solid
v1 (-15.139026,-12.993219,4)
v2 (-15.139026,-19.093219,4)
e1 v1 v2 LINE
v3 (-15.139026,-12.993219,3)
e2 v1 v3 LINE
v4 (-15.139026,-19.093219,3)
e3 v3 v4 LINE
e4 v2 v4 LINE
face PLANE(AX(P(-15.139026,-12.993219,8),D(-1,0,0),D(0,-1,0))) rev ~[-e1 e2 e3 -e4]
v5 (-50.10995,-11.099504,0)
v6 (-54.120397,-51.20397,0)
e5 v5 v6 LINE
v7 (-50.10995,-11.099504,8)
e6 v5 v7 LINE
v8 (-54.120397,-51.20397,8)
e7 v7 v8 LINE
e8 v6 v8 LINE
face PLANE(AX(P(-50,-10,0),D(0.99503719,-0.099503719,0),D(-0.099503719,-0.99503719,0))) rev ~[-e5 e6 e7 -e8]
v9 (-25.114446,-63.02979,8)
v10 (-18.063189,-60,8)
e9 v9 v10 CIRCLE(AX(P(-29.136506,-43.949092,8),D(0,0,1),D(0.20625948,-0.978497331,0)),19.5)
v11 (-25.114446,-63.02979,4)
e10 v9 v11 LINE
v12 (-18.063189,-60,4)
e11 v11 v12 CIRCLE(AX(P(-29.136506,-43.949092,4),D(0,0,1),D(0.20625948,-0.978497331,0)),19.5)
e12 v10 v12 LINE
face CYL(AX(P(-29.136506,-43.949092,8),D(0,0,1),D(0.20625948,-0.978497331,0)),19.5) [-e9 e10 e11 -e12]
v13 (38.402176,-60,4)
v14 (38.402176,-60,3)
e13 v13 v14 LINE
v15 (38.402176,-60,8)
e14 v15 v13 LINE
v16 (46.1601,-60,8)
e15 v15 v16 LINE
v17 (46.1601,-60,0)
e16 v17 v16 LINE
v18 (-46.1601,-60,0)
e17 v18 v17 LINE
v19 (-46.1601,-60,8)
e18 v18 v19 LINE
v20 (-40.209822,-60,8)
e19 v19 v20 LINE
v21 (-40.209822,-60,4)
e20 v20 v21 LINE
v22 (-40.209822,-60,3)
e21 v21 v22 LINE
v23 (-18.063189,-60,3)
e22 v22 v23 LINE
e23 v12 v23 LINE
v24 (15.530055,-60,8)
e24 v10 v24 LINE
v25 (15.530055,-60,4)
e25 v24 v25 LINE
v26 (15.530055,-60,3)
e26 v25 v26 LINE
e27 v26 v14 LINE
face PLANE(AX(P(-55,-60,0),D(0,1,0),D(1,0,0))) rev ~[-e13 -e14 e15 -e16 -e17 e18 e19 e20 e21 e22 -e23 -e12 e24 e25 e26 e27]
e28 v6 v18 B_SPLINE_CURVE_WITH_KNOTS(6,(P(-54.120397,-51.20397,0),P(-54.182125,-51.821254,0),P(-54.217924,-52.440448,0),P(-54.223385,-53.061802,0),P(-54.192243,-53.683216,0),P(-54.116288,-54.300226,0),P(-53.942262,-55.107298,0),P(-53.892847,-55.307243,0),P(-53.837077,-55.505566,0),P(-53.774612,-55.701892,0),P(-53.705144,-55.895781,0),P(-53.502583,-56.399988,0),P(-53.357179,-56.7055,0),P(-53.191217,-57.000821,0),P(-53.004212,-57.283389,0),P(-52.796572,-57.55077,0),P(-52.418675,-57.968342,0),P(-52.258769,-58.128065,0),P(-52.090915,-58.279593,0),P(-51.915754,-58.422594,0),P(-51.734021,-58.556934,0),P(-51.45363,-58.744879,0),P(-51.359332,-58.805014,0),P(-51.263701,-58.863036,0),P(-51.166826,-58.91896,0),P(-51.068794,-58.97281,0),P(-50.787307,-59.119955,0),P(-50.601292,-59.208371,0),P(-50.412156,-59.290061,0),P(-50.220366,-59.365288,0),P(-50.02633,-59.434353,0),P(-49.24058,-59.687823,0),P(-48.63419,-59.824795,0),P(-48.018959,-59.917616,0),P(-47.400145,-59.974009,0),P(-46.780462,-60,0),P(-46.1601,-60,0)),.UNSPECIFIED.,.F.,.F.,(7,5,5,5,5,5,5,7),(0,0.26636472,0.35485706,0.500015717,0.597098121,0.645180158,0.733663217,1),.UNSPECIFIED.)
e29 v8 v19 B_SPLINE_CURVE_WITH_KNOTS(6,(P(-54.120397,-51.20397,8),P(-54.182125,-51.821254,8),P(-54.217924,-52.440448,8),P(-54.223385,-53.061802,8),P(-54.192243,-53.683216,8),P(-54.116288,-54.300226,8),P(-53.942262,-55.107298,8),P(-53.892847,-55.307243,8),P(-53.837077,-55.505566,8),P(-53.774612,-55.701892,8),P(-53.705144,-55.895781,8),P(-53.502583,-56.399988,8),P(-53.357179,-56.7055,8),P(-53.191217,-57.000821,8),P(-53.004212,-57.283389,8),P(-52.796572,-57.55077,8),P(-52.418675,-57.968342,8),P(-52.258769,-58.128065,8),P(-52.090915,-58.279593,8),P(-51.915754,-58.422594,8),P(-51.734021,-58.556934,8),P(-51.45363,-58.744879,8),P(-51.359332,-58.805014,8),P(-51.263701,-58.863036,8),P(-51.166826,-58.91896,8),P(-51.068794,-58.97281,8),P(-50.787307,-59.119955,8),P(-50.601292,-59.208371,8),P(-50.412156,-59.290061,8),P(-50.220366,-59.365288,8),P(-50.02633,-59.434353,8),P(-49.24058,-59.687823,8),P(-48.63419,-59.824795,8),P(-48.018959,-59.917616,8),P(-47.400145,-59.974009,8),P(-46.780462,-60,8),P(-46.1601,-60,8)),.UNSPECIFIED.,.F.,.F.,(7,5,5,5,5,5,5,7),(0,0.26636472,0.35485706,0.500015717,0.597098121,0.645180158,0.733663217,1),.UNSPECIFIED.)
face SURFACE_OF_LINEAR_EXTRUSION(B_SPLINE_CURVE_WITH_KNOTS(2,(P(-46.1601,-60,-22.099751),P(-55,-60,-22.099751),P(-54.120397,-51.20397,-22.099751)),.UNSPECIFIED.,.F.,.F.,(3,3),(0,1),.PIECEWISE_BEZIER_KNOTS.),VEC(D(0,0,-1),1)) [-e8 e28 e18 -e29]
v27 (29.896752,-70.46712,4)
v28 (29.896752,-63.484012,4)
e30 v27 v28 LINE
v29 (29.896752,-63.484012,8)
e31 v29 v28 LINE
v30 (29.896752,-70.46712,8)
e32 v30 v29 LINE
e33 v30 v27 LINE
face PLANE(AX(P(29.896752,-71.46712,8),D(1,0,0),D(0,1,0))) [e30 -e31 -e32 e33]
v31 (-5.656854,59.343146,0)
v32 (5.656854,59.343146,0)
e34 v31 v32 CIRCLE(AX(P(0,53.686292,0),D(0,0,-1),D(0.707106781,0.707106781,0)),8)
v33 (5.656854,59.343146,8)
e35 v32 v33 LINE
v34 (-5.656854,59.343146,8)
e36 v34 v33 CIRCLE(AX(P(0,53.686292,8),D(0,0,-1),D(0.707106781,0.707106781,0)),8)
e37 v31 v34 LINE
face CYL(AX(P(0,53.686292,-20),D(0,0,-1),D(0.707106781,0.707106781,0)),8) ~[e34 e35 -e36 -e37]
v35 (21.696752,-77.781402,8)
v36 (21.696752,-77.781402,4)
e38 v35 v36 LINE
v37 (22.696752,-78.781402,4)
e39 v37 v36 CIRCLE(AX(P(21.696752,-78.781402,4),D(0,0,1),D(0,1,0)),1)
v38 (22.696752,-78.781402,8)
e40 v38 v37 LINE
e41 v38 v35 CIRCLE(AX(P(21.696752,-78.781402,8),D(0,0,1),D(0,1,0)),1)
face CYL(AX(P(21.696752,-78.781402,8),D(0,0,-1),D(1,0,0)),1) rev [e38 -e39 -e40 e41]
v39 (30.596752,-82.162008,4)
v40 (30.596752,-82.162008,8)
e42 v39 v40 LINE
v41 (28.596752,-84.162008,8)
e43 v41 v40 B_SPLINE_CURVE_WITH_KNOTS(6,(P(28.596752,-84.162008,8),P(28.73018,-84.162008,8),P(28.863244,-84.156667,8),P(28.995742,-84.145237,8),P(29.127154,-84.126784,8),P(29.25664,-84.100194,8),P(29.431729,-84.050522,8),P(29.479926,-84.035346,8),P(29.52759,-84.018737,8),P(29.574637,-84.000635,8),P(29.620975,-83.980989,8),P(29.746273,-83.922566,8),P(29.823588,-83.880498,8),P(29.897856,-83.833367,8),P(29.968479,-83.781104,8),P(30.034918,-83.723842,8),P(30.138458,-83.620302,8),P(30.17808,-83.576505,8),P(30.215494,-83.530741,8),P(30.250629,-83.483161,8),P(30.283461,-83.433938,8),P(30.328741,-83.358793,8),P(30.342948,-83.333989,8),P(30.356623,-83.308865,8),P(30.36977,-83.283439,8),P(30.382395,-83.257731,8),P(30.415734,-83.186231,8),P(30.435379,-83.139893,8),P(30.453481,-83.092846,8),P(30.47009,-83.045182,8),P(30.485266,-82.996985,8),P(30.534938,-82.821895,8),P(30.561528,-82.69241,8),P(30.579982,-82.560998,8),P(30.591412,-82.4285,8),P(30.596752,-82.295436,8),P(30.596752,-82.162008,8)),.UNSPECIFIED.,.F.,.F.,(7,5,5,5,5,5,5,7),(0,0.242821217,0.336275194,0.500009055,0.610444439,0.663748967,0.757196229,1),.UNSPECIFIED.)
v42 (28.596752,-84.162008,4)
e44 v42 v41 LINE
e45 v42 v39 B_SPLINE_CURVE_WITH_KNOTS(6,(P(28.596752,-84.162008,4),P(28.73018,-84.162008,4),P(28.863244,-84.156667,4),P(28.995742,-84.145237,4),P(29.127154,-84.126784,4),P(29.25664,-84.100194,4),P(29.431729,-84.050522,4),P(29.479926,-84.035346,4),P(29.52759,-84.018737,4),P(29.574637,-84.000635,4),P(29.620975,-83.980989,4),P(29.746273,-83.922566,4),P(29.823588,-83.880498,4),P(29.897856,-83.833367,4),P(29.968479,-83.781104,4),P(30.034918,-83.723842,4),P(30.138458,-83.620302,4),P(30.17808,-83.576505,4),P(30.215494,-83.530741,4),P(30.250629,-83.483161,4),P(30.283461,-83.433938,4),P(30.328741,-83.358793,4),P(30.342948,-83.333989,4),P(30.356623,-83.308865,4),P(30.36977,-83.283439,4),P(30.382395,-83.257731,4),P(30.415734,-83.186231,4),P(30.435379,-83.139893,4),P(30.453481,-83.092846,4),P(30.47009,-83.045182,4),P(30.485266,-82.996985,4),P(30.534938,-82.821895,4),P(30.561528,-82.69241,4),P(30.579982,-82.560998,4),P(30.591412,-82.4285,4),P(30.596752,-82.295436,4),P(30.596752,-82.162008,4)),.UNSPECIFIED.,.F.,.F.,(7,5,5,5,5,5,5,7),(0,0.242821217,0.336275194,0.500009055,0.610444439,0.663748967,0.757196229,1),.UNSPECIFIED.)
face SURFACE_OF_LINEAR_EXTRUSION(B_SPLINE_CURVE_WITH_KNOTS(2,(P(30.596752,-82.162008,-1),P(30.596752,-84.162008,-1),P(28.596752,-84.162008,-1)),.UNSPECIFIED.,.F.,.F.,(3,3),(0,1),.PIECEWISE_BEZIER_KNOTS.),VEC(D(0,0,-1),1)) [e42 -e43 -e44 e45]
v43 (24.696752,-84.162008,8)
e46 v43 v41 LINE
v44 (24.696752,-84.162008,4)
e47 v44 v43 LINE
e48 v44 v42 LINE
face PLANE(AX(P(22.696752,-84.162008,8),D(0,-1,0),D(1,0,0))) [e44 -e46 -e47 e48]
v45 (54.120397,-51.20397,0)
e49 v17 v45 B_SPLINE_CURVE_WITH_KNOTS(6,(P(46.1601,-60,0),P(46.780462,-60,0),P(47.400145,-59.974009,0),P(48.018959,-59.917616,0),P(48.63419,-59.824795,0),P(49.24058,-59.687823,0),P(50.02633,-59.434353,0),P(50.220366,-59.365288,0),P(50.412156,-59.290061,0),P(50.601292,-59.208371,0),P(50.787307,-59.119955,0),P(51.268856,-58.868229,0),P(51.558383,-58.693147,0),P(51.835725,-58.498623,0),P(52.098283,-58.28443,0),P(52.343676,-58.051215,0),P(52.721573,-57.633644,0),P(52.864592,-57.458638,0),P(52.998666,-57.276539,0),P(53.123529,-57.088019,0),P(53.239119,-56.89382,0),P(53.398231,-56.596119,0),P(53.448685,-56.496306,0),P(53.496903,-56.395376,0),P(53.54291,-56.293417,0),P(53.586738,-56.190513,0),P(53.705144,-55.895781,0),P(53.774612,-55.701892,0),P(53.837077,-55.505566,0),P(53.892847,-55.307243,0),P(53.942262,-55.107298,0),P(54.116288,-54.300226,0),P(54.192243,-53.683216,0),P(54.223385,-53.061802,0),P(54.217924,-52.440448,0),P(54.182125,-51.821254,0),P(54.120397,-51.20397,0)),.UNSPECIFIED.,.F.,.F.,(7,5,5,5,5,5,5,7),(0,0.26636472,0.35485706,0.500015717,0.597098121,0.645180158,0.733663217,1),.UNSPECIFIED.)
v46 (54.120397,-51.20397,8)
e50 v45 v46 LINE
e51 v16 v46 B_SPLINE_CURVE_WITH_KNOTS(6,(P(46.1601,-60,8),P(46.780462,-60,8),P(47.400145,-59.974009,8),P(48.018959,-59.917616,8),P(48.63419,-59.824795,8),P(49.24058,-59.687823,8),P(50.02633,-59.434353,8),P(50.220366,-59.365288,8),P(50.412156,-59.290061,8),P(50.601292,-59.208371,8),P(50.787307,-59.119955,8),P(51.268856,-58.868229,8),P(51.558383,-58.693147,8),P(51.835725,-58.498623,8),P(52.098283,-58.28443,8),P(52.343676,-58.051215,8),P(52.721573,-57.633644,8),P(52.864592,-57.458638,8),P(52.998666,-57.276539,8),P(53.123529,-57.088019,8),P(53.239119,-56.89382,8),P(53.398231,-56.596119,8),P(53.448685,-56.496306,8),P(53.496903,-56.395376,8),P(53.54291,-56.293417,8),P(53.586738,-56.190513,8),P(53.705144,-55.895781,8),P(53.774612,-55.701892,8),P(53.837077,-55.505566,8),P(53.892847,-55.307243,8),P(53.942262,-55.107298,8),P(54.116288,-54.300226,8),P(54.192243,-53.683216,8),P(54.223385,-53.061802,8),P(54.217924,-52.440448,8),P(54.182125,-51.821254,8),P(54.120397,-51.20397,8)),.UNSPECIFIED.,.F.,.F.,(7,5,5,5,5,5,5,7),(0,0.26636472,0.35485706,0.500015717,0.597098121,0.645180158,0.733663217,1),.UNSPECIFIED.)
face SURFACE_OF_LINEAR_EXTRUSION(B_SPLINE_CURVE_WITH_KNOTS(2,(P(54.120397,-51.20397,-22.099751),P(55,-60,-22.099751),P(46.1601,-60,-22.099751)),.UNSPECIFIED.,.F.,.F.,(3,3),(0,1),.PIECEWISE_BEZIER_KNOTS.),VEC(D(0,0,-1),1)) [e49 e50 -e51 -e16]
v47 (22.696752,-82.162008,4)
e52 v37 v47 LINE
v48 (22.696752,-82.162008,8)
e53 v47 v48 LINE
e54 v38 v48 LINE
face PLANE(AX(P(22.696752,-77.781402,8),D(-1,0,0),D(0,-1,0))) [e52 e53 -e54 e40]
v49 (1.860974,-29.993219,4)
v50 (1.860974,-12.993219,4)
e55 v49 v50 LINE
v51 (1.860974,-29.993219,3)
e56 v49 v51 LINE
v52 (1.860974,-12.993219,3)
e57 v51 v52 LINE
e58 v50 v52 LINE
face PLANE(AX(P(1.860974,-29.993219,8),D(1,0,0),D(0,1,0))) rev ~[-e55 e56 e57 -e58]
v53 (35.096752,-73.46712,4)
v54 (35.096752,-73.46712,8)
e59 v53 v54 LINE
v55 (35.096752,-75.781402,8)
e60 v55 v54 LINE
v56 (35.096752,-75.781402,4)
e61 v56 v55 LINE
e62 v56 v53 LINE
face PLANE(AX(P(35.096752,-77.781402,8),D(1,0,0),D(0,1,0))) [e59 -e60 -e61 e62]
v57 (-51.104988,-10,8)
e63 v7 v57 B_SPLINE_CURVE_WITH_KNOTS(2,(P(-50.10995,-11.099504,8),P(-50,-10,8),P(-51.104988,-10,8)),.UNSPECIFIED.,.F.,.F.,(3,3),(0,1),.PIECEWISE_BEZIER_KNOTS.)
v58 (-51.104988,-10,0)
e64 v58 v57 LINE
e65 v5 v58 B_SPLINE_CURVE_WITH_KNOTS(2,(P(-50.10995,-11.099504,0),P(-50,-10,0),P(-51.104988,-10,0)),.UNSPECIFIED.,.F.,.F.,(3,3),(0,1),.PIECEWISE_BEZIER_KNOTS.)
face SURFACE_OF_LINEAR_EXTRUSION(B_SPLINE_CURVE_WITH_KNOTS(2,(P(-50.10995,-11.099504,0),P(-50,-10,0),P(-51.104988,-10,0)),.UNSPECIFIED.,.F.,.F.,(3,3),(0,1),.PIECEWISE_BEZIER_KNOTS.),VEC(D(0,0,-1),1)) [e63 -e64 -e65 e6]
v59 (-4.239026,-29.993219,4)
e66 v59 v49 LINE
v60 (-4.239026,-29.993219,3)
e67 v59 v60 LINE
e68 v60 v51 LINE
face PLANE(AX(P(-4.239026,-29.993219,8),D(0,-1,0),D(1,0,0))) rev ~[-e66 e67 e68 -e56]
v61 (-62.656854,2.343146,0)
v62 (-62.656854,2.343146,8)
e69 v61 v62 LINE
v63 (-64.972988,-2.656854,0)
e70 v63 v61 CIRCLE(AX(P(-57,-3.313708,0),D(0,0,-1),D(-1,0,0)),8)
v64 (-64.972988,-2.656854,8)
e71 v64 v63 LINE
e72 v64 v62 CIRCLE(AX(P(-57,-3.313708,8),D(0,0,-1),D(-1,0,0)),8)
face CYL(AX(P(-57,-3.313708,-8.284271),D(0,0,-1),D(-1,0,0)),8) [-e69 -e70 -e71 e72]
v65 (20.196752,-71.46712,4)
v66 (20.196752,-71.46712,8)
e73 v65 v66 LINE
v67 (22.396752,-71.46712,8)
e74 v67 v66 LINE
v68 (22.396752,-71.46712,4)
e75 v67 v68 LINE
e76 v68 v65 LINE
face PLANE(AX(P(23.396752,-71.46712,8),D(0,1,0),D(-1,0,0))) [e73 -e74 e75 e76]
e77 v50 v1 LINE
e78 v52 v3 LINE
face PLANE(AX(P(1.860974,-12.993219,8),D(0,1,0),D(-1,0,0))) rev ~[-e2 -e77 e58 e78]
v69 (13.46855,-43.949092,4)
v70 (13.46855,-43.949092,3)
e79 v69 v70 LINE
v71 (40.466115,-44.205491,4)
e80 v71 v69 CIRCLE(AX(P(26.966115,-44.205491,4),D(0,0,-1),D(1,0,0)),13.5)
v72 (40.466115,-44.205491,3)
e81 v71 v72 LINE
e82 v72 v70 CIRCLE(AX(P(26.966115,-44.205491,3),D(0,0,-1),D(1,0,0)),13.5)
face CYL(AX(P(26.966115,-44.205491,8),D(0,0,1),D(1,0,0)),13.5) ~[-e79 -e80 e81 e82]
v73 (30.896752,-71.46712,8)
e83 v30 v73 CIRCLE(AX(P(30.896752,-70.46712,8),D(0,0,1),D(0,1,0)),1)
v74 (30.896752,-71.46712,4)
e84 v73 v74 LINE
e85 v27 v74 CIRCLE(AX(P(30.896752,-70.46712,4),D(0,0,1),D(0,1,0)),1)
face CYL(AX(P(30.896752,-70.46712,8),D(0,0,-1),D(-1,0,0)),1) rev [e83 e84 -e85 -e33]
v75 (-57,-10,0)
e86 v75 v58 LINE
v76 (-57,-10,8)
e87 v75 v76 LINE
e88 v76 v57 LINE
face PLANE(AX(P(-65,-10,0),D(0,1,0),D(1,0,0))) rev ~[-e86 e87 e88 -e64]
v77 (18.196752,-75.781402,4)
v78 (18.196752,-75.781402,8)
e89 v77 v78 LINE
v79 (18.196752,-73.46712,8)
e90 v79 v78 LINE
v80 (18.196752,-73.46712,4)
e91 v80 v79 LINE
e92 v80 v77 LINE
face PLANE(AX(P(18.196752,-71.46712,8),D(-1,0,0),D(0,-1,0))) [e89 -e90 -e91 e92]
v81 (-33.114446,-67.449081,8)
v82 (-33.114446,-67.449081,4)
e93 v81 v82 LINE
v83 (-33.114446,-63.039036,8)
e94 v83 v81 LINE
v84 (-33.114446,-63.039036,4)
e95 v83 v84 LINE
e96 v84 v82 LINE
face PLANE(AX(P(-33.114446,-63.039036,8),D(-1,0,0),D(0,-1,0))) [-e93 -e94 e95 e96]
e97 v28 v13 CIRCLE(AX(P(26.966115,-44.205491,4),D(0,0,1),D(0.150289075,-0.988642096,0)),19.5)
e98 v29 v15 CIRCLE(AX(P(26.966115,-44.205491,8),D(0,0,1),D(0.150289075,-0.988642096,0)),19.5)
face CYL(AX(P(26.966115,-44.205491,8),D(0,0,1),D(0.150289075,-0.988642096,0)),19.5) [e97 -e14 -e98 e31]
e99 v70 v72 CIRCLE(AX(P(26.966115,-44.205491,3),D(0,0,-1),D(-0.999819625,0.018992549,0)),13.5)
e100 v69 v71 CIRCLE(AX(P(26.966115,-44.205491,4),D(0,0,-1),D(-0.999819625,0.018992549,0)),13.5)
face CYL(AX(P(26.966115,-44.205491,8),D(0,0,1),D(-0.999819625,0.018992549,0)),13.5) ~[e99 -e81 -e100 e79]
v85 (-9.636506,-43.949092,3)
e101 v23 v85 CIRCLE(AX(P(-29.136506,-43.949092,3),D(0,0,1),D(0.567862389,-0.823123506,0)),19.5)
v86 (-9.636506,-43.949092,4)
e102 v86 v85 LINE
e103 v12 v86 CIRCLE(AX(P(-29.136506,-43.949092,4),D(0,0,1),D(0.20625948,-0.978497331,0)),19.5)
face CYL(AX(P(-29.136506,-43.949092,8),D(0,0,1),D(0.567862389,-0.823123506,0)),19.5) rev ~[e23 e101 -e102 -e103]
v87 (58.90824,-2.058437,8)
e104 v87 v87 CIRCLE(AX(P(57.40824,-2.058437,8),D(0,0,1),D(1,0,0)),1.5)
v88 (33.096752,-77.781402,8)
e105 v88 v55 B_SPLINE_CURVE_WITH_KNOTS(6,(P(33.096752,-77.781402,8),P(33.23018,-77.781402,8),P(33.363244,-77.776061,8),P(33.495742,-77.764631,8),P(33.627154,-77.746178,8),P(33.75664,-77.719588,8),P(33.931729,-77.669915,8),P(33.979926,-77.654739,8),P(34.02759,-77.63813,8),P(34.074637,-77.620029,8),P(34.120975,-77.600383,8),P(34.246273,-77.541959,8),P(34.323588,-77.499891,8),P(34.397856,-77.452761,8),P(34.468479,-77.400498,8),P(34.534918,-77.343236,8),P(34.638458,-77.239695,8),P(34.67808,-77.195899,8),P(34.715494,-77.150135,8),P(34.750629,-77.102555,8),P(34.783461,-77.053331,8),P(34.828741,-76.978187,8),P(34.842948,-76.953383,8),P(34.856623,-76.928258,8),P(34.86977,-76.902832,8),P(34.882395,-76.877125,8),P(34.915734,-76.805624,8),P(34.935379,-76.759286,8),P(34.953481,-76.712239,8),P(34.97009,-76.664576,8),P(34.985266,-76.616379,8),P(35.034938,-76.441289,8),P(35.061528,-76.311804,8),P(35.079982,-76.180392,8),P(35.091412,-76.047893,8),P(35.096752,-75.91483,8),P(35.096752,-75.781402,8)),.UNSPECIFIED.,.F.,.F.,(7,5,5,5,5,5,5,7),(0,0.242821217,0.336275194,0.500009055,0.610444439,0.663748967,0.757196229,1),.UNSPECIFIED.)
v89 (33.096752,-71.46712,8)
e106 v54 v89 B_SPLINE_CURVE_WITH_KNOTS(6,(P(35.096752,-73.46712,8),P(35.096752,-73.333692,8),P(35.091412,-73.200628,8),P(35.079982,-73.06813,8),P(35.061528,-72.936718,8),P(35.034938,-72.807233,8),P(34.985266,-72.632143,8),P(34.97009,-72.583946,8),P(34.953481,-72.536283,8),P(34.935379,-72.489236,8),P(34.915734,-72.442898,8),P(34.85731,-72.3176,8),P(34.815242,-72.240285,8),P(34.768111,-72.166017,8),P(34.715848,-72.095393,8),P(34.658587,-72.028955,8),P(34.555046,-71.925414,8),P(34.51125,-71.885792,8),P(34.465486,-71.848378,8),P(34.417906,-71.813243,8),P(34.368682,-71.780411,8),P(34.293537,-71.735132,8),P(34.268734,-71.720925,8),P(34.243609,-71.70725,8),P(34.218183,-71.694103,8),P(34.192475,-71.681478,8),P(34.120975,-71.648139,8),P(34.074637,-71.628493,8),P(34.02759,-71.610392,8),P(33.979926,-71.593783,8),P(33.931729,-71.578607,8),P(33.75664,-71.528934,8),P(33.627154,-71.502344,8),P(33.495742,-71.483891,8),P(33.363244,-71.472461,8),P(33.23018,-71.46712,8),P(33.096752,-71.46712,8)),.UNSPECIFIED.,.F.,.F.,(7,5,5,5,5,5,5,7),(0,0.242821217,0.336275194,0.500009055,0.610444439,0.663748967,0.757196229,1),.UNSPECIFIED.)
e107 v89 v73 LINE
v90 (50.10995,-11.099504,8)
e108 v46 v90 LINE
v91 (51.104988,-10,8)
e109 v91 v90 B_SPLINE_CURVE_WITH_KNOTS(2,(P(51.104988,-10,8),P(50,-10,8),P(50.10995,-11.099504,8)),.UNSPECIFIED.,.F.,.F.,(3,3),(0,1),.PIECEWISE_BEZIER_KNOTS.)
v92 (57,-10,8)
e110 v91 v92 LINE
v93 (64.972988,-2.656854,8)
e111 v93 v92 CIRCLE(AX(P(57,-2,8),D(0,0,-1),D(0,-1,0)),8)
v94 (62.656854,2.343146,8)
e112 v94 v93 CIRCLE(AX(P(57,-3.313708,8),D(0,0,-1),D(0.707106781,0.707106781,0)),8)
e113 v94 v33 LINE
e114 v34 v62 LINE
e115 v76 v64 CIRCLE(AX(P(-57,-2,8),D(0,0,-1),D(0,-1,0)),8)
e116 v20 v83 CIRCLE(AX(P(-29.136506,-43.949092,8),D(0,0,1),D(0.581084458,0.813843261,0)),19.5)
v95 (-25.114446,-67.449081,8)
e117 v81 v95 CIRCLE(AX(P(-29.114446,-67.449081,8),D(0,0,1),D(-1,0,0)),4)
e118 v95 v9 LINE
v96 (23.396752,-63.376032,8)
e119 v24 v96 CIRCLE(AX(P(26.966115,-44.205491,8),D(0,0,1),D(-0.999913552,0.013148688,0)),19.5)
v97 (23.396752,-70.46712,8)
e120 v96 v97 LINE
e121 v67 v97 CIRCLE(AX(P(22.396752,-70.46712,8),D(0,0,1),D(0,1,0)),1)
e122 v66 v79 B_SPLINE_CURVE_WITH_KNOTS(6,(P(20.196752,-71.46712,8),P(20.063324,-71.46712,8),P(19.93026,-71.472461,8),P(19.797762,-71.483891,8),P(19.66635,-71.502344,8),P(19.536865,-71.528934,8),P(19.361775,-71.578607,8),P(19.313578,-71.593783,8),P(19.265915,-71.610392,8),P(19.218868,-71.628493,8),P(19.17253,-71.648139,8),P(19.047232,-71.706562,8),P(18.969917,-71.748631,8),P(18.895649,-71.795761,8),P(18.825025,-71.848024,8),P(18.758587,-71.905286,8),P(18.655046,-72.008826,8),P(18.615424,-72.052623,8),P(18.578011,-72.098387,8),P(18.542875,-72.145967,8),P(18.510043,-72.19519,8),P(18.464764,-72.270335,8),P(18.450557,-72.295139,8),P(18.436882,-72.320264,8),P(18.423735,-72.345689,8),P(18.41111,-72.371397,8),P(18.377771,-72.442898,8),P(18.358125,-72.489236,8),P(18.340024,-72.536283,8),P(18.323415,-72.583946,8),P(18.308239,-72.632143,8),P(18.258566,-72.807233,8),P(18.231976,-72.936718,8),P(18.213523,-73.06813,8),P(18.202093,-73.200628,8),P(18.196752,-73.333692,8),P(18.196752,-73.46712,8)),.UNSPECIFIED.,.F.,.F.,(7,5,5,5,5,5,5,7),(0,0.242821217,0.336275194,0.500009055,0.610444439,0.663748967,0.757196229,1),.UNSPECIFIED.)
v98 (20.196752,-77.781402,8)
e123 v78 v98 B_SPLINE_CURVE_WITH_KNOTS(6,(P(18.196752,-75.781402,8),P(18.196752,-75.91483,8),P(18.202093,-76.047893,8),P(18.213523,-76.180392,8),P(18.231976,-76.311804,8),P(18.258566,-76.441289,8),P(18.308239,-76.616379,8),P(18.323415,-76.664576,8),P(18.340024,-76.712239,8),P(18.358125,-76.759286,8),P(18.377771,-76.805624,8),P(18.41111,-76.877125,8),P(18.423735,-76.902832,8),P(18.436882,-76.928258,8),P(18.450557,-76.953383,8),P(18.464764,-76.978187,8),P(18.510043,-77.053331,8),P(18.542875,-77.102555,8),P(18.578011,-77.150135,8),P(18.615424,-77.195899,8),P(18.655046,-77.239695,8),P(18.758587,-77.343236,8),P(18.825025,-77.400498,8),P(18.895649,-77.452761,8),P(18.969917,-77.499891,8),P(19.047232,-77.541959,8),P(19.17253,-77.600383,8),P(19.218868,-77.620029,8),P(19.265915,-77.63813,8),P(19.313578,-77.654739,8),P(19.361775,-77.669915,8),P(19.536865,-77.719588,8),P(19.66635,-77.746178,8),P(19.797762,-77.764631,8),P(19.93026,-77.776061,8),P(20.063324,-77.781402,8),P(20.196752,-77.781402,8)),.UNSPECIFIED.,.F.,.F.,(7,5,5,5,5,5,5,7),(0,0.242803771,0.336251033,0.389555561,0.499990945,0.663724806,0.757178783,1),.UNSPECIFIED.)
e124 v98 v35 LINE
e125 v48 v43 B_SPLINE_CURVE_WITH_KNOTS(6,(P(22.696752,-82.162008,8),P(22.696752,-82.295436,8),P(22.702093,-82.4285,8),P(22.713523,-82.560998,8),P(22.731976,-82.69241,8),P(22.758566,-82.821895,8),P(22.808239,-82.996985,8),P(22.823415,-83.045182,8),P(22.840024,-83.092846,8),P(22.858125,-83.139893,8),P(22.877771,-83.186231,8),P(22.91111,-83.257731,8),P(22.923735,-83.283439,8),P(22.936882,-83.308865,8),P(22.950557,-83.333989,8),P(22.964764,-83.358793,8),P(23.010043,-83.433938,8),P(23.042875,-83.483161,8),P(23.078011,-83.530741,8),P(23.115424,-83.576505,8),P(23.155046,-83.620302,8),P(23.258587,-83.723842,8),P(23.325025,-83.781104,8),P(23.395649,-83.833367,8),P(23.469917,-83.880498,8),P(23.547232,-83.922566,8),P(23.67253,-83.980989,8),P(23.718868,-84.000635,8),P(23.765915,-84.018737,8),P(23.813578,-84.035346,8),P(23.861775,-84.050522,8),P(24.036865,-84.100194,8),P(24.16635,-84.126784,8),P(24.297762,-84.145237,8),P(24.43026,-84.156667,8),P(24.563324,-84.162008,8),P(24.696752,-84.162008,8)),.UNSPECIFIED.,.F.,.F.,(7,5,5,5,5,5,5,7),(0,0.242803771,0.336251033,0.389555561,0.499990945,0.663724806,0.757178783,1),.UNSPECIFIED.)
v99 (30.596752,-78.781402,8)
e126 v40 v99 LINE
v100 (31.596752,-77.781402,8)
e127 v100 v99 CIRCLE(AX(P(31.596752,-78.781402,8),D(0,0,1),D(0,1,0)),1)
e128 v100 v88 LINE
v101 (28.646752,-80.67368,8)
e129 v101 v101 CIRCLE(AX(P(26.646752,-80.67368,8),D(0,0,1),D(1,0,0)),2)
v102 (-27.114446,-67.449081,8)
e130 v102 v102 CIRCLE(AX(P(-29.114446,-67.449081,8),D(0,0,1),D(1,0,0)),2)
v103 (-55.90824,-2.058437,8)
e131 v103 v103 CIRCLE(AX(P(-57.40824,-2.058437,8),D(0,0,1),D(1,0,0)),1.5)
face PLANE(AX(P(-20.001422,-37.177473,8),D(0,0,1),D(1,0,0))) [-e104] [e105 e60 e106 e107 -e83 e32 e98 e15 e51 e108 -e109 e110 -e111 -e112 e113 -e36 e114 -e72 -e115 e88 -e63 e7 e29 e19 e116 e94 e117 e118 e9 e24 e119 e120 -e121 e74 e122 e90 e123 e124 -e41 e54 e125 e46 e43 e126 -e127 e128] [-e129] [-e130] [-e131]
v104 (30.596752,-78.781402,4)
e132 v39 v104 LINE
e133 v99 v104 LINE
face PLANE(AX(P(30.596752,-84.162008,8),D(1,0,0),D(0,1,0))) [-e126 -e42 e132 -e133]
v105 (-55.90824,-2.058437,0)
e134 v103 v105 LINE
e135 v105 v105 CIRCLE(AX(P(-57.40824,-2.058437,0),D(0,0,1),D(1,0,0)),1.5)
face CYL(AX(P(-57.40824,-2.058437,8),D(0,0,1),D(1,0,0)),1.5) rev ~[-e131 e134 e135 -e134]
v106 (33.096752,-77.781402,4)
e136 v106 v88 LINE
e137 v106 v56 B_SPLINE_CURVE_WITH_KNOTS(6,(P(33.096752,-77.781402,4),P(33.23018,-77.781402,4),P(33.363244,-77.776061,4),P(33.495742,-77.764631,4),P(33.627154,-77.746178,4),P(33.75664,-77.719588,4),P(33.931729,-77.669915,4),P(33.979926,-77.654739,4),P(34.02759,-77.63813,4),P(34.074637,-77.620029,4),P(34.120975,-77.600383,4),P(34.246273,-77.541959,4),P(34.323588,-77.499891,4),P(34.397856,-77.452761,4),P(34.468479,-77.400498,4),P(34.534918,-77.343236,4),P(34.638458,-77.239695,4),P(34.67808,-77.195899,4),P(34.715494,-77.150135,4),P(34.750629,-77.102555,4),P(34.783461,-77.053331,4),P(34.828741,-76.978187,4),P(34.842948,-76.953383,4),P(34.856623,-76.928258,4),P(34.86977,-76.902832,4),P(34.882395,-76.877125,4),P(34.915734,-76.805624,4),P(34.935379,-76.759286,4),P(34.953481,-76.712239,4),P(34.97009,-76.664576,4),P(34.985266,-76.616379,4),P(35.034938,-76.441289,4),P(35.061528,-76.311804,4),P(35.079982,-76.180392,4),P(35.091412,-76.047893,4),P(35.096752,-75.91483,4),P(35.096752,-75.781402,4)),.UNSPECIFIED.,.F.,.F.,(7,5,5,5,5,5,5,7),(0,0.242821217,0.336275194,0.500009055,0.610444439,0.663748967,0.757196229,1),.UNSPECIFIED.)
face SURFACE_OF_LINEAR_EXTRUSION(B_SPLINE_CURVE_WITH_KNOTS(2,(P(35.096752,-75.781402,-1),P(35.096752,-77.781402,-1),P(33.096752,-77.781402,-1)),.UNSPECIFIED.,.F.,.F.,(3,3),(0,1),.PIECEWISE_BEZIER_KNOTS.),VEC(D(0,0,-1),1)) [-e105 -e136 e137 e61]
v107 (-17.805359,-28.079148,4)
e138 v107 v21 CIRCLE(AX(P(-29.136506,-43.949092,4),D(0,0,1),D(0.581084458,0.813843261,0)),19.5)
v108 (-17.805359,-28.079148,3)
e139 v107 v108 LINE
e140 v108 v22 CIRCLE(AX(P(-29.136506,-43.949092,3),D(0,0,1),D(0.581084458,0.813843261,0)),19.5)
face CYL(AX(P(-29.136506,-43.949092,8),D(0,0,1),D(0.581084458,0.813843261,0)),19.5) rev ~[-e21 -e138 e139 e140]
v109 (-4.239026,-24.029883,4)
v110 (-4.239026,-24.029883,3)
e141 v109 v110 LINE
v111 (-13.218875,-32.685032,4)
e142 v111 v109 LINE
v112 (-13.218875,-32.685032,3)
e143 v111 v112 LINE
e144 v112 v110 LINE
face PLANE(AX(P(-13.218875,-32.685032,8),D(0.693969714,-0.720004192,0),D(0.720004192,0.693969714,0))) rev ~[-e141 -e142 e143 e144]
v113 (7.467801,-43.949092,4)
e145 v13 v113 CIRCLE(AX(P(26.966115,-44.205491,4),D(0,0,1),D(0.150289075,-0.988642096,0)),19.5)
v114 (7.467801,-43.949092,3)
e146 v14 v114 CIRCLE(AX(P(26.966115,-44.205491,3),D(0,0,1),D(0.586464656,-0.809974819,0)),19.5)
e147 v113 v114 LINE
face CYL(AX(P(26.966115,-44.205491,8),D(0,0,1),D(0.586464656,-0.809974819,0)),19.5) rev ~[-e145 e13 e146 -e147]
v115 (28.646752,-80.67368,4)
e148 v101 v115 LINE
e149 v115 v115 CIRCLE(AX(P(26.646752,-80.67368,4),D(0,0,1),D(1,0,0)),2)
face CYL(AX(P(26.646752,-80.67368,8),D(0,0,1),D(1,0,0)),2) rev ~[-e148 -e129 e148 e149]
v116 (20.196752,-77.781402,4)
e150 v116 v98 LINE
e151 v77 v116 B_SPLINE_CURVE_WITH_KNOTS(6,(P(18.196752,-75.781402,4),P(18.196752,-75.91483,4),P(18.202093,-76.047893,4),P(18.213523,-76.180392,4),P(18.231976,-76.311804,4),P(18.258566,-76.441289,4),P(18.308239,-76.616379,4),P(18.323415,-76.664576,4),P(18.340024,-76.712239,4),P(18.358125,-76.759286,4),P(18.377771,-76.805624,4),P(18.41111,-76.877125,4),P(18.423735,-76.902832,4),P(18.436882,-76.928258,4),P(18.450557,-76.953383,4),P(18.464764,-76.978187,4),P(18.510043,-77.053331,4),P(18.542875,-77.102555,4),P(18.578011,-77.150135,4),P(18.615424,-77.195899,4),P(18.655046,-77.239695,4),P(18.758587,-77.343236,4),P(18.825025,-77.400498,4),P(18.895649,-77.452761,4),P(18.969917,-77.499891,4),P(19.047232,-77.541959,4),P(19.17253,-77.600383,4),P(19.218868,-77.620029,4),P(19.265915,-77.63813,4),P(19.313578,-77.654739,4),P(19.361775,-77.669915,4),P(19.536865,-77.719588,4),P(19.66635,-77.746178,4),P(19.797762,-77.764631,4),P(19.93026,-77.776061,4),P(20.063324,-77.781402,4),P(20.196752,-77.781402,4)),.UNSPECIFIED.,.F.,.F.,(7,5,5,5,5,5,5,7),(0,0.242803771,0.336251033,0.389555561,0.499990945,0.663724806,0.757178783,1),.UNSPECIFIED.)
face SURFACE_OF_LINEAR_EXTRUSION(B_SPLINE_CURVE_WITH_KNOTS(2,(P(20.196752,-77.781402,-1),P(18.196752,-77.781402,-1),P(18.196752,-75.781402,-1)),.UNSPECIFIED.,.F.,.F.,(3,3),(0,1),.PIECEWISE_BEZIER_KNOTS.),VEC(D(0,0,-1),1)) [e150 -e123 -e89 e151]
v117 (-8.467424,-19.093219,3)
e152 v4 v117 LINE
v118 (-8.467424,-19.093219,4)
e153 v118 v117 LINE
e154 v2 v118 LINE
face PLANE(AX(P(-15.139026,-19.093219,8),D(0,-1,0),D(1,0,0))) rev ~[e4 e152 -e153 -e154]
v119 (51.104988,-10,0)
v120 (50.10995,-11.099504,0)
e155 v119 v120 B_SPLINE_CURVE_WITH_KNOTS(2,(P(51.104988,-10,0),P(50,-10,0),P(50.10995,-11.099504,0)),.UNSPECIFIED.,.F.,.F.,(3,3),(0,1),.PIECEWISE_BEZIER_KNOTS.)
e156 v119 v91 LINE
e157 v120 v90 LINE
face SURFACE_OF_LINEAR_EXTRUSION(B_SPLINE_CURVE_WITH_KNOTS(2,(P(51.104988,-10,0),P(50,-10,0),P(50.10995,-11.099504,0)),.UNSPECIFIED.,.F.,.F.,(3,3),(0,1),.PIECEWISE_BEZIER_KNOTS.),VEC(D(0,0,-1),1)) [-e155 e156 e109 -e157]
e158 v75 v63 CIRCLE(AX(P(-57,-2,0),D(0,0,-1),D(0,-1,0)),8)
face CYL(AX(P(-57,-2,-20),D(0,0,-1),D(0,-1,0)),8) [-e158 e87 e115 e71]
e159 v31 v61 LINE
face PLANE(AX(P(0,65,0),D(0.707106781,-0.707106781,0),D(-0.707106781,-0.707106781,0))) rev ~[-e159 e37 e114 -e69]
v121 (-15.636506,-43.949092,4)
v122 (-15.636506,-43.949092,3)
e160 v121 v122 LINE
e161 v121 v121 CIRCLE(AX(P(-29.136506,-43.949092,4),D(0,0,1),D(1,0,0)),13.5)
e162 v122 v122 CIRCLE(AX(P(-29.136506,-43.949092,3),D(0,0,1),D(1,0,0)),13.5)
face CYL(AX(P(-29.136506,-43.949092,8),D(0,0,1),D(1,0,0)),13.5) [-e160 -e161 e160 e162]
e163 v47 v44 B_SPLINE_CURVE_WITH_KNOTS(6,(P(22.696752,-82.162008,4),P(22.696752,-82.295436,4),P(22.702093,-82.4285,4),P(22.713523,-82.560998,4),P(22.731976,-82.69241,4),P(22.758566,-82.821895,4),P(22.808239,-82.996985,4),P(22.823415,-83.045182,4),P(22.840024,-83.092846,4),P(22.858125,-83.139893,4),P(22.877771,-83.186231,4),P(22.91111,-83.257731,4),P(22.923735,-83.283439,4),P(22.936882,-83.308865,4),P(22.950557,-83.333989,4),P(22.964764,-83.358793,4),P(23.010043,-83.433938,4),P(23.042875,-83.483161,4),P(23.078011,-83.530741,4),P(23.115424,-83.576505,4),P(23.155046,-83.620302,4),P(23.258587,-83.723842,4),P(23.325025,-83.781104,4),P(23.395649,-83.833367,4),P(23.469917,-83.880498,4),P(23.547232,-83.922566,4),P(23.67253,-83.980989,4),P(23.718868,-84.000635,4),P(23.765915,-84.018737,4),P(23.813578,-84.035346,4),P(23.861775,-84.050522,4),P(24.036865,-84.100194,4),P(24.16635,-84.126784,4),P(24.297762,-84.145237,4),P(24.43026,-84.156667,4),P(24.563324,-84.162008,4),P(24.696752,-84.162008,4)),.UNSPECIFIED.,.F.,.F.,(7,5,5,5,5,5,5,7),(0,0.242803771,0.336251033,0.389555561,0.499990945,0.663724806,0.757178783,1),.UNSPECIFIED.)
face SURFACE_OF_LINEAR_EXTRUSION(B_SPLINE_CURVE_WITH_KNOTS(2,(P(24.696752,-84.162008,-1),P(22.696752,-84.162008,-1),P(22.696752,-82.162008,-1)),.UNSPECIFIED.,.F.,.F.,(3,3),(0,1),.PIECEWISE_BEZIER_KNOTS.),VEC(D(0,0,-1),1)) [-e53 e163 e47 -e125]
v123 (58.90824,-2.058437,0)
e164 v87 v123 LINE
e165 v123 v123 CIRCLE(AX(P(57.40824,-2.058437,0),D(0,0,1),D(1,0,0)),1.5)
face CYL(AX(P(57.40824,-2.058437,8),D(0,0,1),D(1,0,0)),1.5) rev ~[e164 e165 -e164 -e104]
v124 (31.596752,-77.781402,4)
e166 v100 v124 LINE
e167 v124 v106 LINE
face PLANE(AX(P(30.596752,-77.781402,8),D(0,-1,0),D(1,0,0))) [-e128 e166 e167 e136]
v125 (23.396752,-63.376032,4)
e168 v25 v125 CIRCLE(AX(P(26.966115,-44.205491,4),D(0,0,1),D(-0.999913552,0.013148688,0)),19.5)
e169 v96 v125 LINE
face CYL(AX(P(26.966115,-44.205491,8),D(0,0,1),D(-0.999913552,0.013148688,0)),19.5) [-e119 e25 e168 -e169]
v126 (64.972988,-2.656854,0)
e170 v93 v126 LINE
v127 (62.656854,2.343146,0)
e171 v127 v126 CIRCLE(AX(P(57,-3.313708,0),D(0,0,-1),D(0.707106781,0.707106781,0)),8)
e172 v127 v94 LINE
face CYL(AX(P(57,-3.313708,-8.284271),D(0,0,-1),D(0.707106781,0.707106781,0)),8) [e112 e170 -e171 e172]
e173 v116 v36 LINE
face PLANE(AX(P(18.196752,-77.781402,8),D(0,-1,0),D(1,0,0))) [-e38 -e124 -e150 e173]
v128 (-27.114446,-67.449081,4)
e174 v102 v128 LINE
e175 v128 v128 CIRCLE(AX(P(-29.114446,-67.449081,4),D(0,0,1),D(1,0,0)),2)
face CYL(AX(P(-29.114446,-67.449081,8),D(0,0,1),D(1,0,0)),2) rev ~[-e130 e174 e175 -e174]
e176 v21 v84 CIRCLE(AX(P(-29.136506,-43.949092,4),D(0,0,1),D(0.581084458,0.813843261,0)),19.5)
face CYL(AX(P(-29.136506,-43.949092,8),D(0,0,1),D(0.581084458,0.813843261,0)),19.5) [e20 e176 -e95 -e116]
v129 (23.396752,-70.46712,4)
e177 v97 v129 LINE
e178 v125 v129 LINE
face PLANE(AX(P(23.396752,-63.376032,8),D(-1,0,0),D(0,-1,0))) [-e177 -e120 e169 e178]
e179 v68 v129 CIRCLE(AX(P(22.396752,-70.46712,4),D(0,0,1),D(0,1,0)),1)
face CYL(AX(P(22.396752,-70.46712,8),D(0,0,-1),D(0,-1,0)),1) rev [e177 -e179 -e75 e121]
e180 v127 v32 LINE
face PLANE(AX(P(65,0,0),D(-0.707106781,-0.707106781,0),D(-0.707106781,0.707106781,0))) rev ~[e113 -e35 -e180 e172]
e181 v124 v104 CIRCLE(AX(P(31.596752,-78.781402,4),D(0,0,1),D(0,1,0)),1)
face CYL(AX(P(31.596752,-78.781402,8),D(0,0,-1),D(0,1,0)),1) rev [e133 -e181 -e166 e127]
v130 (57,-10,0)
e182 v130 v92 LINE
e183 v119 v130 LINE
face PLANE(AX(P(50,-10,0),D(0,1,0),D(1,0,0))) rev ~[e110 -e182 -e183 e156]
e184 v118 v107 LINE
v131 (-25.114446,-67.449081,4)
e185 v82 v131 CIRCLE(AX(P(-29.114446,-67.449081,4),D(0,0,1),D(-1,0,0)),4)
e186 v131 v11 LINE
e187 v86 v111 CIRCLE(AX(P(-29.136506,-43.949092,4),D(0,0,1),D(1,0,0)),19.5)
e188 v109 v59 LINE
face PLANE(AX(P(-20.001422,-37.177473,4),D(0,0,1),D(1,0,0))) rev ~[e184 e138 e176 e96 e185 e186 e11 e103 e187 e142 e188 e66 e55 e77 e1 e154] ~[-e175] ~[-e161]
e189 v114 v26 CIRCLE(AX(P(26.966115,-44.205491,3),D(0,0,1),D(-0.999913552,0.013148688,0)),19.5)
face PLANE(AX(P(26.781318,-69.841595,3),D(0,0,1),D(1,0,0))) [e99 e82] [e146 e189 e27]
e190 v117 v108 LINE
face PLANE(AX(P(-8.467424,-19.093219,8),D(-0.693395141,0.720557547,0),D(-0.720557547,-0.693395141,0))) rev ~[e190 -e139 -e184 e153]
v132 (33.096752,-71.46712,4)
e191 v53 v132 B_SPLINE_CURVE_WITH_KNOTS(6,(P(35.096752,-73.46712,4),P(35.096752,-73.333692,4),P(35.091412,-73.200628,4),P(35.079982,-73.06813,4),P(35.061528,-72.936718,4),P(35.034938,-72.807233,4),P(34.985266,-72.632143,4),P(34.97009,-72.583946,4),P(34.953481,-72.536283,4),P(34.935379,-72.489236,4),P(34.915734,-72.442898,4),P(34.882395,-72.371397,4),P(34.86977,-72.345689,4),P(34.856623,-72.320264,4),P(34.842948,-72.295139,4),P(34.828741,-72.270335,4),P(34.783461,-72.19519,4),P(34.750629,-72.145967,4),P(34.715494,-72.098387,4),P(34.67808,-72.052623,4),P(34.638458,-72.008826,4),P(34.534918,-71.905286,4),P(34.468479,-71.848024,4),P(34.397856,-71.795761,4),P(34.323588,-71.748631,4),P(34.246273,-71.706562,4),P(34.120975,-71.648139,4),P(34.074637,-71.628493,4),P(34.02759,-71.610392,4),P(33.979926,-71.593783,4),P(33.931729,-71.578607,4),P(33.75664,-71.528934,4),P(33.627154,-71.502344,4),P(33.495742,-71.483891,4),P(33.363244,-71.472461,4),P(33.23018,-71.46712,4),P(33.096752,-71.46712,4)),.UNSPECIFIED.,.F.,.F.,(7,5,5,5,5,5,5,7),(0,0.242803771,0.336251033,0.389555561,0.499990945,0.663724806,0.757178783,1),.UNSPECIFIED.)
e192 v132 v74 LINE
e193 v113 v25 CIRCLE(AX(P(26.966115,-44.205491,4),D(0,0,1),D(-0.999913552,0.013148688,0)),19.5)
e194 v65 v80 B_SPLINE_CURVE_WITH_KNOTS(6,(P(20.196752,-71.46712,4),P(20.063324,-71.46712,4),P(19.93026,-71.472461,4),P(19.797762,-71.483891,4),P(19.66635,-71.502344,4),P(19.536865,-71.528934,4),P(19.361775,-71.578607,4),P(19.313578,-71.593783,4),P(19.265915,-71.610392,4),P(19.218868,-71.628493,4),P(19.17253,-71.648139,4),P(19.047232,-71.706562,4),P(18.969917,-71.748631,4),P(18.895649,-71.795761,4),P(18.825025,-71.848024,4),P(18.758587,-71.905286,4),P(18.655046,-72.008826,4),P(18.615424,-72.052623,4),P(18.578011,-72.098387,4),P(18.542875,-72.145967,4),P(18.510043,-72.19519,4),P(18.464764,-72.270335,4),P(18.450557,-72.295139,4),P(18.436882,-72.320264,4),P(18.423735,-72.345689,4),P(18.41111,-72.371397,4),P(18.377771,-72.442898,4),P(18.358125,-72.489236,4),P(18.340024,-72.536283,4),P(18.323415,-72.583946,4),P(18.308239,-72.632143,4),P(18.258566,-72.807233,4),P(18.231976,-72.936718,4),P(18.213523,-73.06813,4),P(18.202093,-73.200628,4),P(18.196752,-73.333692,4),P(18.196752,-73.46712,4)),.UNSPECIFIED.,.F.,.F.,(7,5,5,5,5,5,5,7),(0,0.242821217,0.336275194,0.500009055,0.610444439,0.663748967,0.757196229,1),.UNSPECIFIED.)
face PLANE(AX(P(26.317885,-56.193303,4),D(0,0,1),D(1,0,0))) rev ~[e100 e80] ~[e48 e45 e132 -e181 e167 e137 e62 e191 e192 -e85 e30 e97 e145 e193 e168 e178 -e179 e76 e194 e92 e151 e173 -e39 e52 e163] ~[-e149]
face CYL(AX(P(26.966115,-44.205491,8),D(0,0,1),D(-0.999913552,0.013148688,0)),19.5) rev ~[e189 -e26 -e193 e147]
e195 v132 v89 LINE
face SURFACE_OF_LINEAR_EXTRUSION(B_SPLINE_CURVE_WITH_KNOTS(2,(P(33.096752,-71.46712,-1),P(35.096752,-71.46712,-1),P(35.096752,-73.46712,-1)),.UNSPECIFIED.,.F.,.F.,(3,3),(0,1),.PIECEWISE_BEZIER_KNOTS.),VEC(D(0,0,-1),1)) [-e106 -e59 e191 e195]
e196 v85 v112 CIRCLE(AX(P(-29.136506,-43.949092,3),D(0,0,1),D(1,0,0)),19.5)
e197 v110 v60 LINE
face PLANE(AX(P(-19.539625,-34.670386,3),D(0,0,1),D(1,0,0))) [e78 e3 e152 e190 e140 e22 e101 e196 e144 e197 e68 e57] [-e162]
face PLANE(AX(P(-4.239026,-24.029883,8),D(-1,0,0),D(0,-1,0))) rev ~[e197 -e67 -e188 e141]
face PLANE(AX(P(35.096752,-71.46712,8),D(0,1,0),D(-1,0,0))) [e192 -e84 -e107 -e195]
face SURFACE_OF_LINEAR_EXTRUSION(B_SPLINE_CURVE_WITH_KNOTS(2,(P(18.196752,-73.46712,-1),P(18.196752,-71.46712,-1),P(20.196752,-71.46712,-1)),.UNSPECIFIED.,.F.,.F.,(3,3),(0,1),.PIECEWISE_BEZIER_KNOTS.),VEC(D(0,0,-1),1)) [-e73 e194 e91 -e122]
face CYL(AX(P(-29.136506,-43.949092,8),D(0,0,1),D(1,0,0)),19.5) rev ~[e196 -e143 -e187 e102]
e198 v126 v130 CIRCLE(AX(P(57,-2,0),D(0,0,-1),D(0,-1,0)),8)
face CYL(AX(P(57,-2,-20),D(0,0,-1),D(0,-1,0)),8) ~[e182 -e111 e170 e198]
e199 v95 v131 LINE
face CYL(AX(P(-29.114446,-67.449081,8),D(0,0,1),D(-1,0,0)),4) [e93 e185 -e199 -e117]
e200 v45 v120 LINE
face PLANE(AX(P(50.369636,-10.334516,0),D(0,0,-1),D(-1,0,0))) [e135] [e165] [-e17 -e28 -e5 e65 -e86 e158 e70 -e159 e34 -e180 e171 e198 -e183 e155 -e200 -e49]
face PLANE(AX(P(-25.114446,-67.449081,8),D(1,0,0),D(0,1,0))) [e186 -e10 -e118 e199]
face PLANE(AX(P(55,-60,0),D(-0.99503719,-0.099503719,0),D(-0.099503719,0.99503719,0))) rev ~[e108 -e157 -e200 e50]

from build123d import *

# Parameters (mm, degrees)
F1_DEPTH    = 8
F2_T1_DEPTH = 24.5685424949
F2_T3_DEPTH = 48
F3_T1_DEPTH = 8
F4_T1_DEPTH = 52.1995024845
F5_R        = 13.5
F5_R_2      = 2
F6_DEPTH    = 5
F7_DEPTH    = 4
F8_T1_DEPTH = 14
F9_R        = 1
F10_R       = 1.5
F11_DEPTH   = 25


# Not quite as in the source:
# - a fillet or chamfer that OpenCascade refuses, or shapes differently, is made with other operations: its cross-section is extruded or revolved along the edge and cut away or added


with BuildPart() as f1:
    # F0 (on Top) → F1 (new body)
    with BuildSketch(Plane.XY):
        Polygon((65, 0), (0, 65), (-65, 0), (-65, -10), (-50, -10), (-55, -60), (0, -60), (55, -60), (50, -10), (65, -10), align=None)
    extrude(amount=F1_DEPTH)

    # F2: fillet of radius 8 on 5 edges, made by hand

    # F2_s2 → F2_t1 (cut)
    with BuildSketch(Plane.XY.offset(-8.2842712475)):
        with BuildLine():
            ThreePointArc((-65, -3.313708499), (-64.3910362601, -0.2522410401), (-62.6568542495, 2.3431457505))
            Line((-62.6568542495, 2.3431457505), (-65, 0))
            Line((-65, 0), (-65, -3.313708499))
        make_face()
        with BuildLine():
            ThreePointArc((62.6568542495, 2.3431457505), (64.3910362601, -0.2522410401), (65, -3.313708499))
            Line((65, -3.313708499), (65, 0))
            Line((65, 0), (62.6568542495, 2.3431457505))
        make_face()
    extrude(amount=F2_T1_DEPTH, mode=Mode.SUBTRACT)

    # F2_s4 → F2_t3 (cut)
    with BuildSketch(Plane.XY.offset(-20)):
        with BuildLine():
            ThreePointArc((5.6568542495, 59.3431457505), (0, 61.686291501), (-5.6568542495, 59.3431457505))
            Line((-5.6568542495, 59.3431457505), (0, 65))
            Line((0, 65), (5.6568542495, 59.3431457505))
        make_face()
        with BuildLine():
            ThreePointArc((57, -10), (62.6568542495, -7.6568542495), (65, -2))
            Line((65, -2), (65, -10))
            Line((65, -10), (57, -10))
        make_face()
        with BuildLine():
            ThreePointArc((-57, -10), (-62.6568542495, -7.6568542495), (-65, -2))
            Line((-65, -2), (-65, -10))
            Line((-65, -10), (-57, -10))
        make_face()
    extrude(amount=F2_T3_DEPTH, mode=Mode.SUBTRACT)

    # F3: fillet of radius 1 on 2 edges, made by hand

    # F3_s2 → F3_t1 (join)
    with BuildSketch(Plane.XY):
        with BuildLine():
            add(Edge.make_bspline(
                [(51.1049875621, -10), (50, -10), (50.1099503719, -11.099503719)],
                knots=[0, 0, 0, 1, 1, 1], degree=2, weights=[1, 1, 1]))
            Line((50.1099503719, -11.099503719), (50, -10))
            Line((50, -10), (51.1049875621, -10))
        make_face()
        with BuildLine():
            add(Edge.make_bspline(
                [(-50.1099503719, -11.099503719), (-50, -10), (-51.1049875621, -10)],
                knots=[0, 0, 0, 1, 1, 1], degree=2, weights=[1, 1, 1]))
            Line((-51.1049875621, -10), (-50, -10))
            Line((-50, -10), (-50.1099503719, -11.099503719))
        make_face()
    extrude(amount=F3_T1_DEPTH)

    # F4: fillet of radius 8 on 2 edges, made by hand

    # F4_s2 → F4_t1 (cut)
    with BuildSketch(Plane.XY.offset(-22.0997512422)):
        with BuildLine():
            add(Edge.make_bspline(
                [(-46.1600995031, -60), (-55, -60), (-54.1203970248, -51.2039702478)],
                knots=[0, 0, 0, 1, 1, 1], degree=2, weights=[1, 1, 1]))
            Line((-54.1203970248, -51.2039702478), (-55, -60))
            Line((-55, -60), (-46.1600995031, -60))
        make_face()
        with BuildLine():
            add(Edge.make_bspline(
                [(54.1203970248, -51.2039702478), (55, -60), (46.1600995031, -60)],
                knots=[0, 0, 0, 1, 1, 1], degree=2, weights=[1, 1, 1]))
            Line((46.1600995031, -60), (55, -60))
            Line((55, -60), (54.1203970248, -51.2039702478))
        make_face()
    extrude(amount=F4_T1_DEPTH, mode=Mode.SUBTRACT)

    # F5 (on face) → F6 (cut)
    with BuildSketch(Plane.XY.offset(8)):
        with BuildLine():
            Line((-8.4674237296, -19.0932191908), (-17.8053588669, -28.0791480434))
            ThreePointArc((-17.8053588669, -28.0791480434), (-45.0974523982, -32.7464944514), (-40.2098223871, -60))
            Line((-40.2098223871, -60), (-18.0631891992, -60))
            ThreePointArc((-18.0631891992, -60), (-11.8712274348, -53.0133159845), (-9.6365057932, -43.9490916266))
            ThreePointArc((-9.6365057932, -43.9490916266), (-10.5536669898, -38.0390914567), (-13.2188752299, -32.6850320897))
            Line((-13.2188752299, -32.6850320897), (-4.2390260021, -24.0298833133))
            Line((-4.2390260021, -24.0298833133), (-4.2390260021, -29.9932191908))
            Line((-4.2390260021, -29.9932191908), (1.8609739979, -29.9932191908))
            Line((1.8609739979, -29.9932191908), (1.8609739979, -12.9932191908))
            Line((1.8609739979, -12.9932191908), (-15.1390260021, -12.9932191908))
            Line((-15.1390260021, -12.9932191908), (-15.1390260021, -19.0932191908))
            Line((-15.1390260021, -19.0932191908), (-8.4674237296, -19.0932191908))
        make_face()
        with Locations((-29.1365057932, -43.9490916266)):
            Circle(F5_R, mode=Mode.SUBTRACT)
        with BuildLine():
            Line((-18.0631891992, -60), (-40.2098223871, -60))
            ThreePointArc((-40.2098223871, -60), (-36.8140065496, -61.8741015885), (-33.1144459271, -63.039036422))
            Line((-33.1144459271, -63.039036422), (-33.1144459271, -67.4490812726))
            ThreePointArc((-33.1144459271, -67.4490812726), (-29.1144459271, -71.4490812726), (-25.1144459271, -67.4490812726))
            Line((-25.1144459271, -67.4490812726), (-25.1144459271, -63.0297895812))
            ThreePointArc((-25.1144459271, -63.0297895812), (-21.4382914649, -61.8652155421), (-18.0631891992, -60))
        make_face()
        with Locations((-29.1144459271, -67.4490812726)):
            Circle(F5_R_2, mode=Mode.SUBTRACT)
        with BuildLine():
            Line((38.4021761528, -60), (15.5300545524, -60))
            ThreePointArc((15.5300545524, -60), (19.2758562864, -62.1250310842), (23.3967523072, -63.3760321733))
            Line((23.3967523072, -63.3760321733), (23.3967523072, -71.4671202268))
            Line((23.3967523072, -71.4671202268), (18.1967523072, -71.4671202268))
            Line((18.1967523072, -71.4671202268), (18.1967523072, -77.7814015746))
            Line((18.1967523072, -77.7814015746), (22.6967523072, -77.7814015746))
            Line((22.6967523072, -77.7814015746), (22.6967523072, -84.1620080173))
            Line((22.6967523072, -84.1620080173), (30.5967523072, -84.1620080173))
            Line((30.5967523072, -84.1620080173), (30.5967523072, -77.7814015746))
            Line((30.5967523072, -77.7814015746), (35.0967523072, -77.7814015746))
            Line((35.0967523072, -77.7814015746), (35.0967523072, -71.4671202268))
            Line((35.0967523072, -71.4671202268), (29.8967523072, -71.4671202268))
            Line((29.8967523072, -71.4671202268), (29.8967523072, -63.48401191))
            ThreePointArc((29.8967523072, -63.48401191), (34.357670388, -62.2502940054), (38.4021761528, -60))
        make_face()
        with Locations((26.6467523072, -80.6736797094)):
            Circle(F5_R_2, mode=Mode.SUBTRACT)
        with BuildLine():
            ThreePointArc((7.4678010834, -43.9490916266), (9.5407945482, -52.9581017828), (15.5300545524, -60))
            Line((15.5300545524, -60), (38.4021761528, -60))
            ThreePointArc((38.4021761528, -60), (35.9470895566, -26.8967619578), (7.4678010834, -43.9490916266))
        make_face()
        with BuildLine():
            ThreePointArc((40.4661153526, -44.2054910373), (26.8379098659, -57.7048822588), (13.4685504114, -43.9490916266))
            ThreePointArc((13.4685504114, -43.9490916266), (27.0943208393, -30.7060998157), (40.4661153526, -44.2054910373))
        make_face(mode=Mode.SUBTRACT)
    extrude(amount=-F6_DEPTH, mode=Mode.SUBTRACT)

    # F5 (on face) → F7 (join)
    with BuildSketch(Plane.XY.offset(8)):
        with BuildLine():
            Line((-8.4674237296, -19.0932191908), (-17.8053588669, -28.0791480434))
            ThreePointArc((-17.8053588669, -28.0791480434), (-46.9989205625, -36.1270625672), (-33.1144459271, -63.039036422))
            Line((-33.1144459271, -63.039036422), (-33.1144459271, -67.4490812726))
            ThreePointArc((-33.1144459271, -67.4490812726), (-29.1144459271, -71.4490812726), (-25.1144459271, -67.4490812726))
            Line((-25.1144459271, -67.4490812726), (-25.1144459271, -63.0297895812))
            ThreePointArc((-25.1144459271, -63.0297895812), (-13.99252733, -56.2336313537), (-9.6365057932, -43.9490916266))
            ThreePointArc((-9.6365057932, -43.9490916266), (-10.5536669898, -38.0390914567), (-13.2188752299, -32.6850320897))
            Line((-13.2188752299, -32.6850320897), (-4.2390260021, -24.0298833133))
            Line((-4.2390260021, -24.0298833133), (-4.2390260021, -29.9932191908))
            Line((-4.2390260021, -29.9932191908), (1.8609739979, -29.9932191908))
            Line((1.8609739979, -29.9932191908), (1.8609739979, -12.9932191908))
            Line((1.8609739979, -12.9932191908), (-15.1390260021, -12.9932191908))
            Line((-15.1390260021, -12.9932191908), (-15.1390260021, -19.0932191908))
            Line((-15.1390260021, -19.0932191908), (-8.4674237296, -19.0932191908))
        make_face()
        with Locations((-29.1144459271, -67.4490812726)):
            Circle(F5_R_2, mode=Mode.SUBTRACT)
        with Locations((-29.1365057932, -43.9490916266)):
            Circle(F5_R, mode=Mode.SUBTRACT)
        with BuildLine():
            ThreePointArc((29.8967523072, -63.48401191), (39.7733500471, -29.500908776), (7.4678010834, -43.9490916266))
            ThreePointArc((7.4678010834, -43.9490916266), (11.8869595763, -56.5695138889), (23.3967523072, -63.3760321733))
            Line((23.3967523072, -63.3760321733), (23.3967523072, -71.4671202268))
            Line((23.3967523072, -71.4671202268), (18.1967523072, -71.4671202268))
            Line((18.1967523072, -71.4671202268), (18.1967523072, -77.7814015746))
            Line((18.1967523072, -77.7814015746), (22.6967523072, -77.7814015746))
            Line((22.6967523072, -77.7814015746), (22.6967523072, -84.1620080173))
            Line((22.6967523072, -84.1620080173), (30.5967523072, -84.1620080173))
            Line((30.5967523072, -84.1620080173), (30.5967523072, -77.7814015746))
            Line((30.5967523072, -77.7814015746), (35.0967523072, -77.7814015746))
            Line((35.0967523072, -77.7814015746), (35.0967523072, -71.4671202268))
            Line((35.0967523072, -71.4671202268), (29.8967523072, -71.4671202268))
            Line((29.8967523072, -71.4671202268), (29.8967523072, -63.48401191))
        make_face()
        with Locations((26.6467523072, -80.6736797094)):
            Circle(F5_R_2, mode=Mode.SUBTRACT)
        with BuildLine():
            ThreePointArc((40.4661153526, -44.2054910373), (26.8379098659, -57.7048822588), (13.4685504114, -43.9490916266))
            ThreePointArc((13.4685504114, -43.9490916266), (27.0943208393, -30.7060998157), (40.4661153526, -44.2054910373))
        make_face(mode=Mode.SUBTRACT)
    extrude(amount=-F7_DEPTH)

    # F8: fillet of radius 2 on 6 edges, made by hand

    # F8_s2 → F8_t1 (cut)
    with BuildSketch(Plane.XY.offset(-1)):
        with BuildLine():
            add(Edge.make_bspline(
                [(30.5967523072, -82.1620080173), (30.5967523072, -84.1620080173), (28.5967523072, -84.1620080173)],
                knots=[0, 0, 0, 1, 1, 1], degree=2, weights=[1, 1, 1]))
            Line((28.5967523072, -84.1620080173), (30.5967523072, -84.1620080173))
            Line((30.5967523072, -84.1620080173), (30.5967523072, -82.1620080173))
        make_face()
        with BuildLine():
            add(Edge.make_bspline(
                [(24.6967523072, -84.1620080173), (22.6967523072, -84.1620080173), (22.6967523072, -82.1620080173)],
                knots=[0, 0, 0, 1, 1, 1], degree=2, weights=[1, 1, 1]))
            Line((22.6967523072, -82.1620080173), (22.6967523072, -84.1620080173))
            Line((22.6967523072, -84.1620080173), (24.6967523072, -84.1620080173))
        make_face()
        with BuildLine():
            add(Edge.make_bspline(
                [(20.1967523072, -77.7814015746), (18.1967523072, -77.7814015746), (18.1967523072, -75.7814015746)],
                knots=[0, 0, 0, 1, 1, 1], degree=2, weights=[1, 1, 1]))
            Line((18.1967523072, -75.7814015746), (18.1967523072, -77.7814015746))
            Line((18.1967523072, -77.7814015746), (20.1967523072, -77.7814015746))
        make_face()
        with BuildLine():
            add(Edge.make_bspline(
                [(35.0967523072, -75.7814015746), (35.0967523072, -77.7814015746), (33.0967523072, -77.7814015746)],
                knots=[0, 0, 0, 1, 1, 1], degree=2, weights=[1, 1, 1]))
            Line((33.0967523072, -77.7814015746), (35.0967523072, -77.7814015746))
            Line((35.0967523072, -77.7814015746), (35.0967523072, -75.7814015746))
        make_face()
        with BuildLine():
            add(Edge.make_bspline(
                [(33.0967523072, -71.4671202268), (35.0967523072, -71.4671202268), (35.0967523072, -73.4671202268)],
                knots=[0, 0, 0, 1, 1, 1], degree=2, weights=[1, 1, 1]))
            Line((35.0967523072, -73.4671202268), (35.0967523072, -71.4671202268))
            Line((35.0967523072, -71.4671202268), (33.0967523072, -71.4671202268))
        make_face()
        with BuildLine():
            add(Edge.make_bspline(
                [(18.1967523072, -73.4671202268), (18.1967523072, -71.4671202268), (20.1967523072, -71.4671202268)],
                knots=[0, 0, 0, 1, 1, 1], degree=2, weights=[1, 1, 1]))
            Line((20.1967523072, -71.4671202268), (18.1967523072, -71.4671202268))
            Line((18.1967523072, -71.4671202268), (18.1967523072, -73.4671202268))
        make_face()
    extrude(amount=F8_T1_DEPTH, mode=Mode.SUBTRACT)

    # F9
    f9_edges = [f1.edges().sort_by_distance(p)[0] for p in [
        (23.396752, -71.46712, 6),
        (29.896752, -71.46712, 6),
        (30.596752, -77.781402, 6),
        (22.696752, -77.781402, 6),
    ]]
    fillet(f9_edges, radius=F9_R)

    # F10 (on face) → F11 (cut)
    with BuildSketch(Plane.XY.offset(8)):
        with Locations((-57.4082396924, -2.0584366284)):
            Circle(F10_R)
        with Locations((57.4082396924, -2.0584366284)):
            Circle(F10_R)
    extrude(amount=-F11_DEPTH, mode=Mode.SUBTRACT)


solid = f1.part
